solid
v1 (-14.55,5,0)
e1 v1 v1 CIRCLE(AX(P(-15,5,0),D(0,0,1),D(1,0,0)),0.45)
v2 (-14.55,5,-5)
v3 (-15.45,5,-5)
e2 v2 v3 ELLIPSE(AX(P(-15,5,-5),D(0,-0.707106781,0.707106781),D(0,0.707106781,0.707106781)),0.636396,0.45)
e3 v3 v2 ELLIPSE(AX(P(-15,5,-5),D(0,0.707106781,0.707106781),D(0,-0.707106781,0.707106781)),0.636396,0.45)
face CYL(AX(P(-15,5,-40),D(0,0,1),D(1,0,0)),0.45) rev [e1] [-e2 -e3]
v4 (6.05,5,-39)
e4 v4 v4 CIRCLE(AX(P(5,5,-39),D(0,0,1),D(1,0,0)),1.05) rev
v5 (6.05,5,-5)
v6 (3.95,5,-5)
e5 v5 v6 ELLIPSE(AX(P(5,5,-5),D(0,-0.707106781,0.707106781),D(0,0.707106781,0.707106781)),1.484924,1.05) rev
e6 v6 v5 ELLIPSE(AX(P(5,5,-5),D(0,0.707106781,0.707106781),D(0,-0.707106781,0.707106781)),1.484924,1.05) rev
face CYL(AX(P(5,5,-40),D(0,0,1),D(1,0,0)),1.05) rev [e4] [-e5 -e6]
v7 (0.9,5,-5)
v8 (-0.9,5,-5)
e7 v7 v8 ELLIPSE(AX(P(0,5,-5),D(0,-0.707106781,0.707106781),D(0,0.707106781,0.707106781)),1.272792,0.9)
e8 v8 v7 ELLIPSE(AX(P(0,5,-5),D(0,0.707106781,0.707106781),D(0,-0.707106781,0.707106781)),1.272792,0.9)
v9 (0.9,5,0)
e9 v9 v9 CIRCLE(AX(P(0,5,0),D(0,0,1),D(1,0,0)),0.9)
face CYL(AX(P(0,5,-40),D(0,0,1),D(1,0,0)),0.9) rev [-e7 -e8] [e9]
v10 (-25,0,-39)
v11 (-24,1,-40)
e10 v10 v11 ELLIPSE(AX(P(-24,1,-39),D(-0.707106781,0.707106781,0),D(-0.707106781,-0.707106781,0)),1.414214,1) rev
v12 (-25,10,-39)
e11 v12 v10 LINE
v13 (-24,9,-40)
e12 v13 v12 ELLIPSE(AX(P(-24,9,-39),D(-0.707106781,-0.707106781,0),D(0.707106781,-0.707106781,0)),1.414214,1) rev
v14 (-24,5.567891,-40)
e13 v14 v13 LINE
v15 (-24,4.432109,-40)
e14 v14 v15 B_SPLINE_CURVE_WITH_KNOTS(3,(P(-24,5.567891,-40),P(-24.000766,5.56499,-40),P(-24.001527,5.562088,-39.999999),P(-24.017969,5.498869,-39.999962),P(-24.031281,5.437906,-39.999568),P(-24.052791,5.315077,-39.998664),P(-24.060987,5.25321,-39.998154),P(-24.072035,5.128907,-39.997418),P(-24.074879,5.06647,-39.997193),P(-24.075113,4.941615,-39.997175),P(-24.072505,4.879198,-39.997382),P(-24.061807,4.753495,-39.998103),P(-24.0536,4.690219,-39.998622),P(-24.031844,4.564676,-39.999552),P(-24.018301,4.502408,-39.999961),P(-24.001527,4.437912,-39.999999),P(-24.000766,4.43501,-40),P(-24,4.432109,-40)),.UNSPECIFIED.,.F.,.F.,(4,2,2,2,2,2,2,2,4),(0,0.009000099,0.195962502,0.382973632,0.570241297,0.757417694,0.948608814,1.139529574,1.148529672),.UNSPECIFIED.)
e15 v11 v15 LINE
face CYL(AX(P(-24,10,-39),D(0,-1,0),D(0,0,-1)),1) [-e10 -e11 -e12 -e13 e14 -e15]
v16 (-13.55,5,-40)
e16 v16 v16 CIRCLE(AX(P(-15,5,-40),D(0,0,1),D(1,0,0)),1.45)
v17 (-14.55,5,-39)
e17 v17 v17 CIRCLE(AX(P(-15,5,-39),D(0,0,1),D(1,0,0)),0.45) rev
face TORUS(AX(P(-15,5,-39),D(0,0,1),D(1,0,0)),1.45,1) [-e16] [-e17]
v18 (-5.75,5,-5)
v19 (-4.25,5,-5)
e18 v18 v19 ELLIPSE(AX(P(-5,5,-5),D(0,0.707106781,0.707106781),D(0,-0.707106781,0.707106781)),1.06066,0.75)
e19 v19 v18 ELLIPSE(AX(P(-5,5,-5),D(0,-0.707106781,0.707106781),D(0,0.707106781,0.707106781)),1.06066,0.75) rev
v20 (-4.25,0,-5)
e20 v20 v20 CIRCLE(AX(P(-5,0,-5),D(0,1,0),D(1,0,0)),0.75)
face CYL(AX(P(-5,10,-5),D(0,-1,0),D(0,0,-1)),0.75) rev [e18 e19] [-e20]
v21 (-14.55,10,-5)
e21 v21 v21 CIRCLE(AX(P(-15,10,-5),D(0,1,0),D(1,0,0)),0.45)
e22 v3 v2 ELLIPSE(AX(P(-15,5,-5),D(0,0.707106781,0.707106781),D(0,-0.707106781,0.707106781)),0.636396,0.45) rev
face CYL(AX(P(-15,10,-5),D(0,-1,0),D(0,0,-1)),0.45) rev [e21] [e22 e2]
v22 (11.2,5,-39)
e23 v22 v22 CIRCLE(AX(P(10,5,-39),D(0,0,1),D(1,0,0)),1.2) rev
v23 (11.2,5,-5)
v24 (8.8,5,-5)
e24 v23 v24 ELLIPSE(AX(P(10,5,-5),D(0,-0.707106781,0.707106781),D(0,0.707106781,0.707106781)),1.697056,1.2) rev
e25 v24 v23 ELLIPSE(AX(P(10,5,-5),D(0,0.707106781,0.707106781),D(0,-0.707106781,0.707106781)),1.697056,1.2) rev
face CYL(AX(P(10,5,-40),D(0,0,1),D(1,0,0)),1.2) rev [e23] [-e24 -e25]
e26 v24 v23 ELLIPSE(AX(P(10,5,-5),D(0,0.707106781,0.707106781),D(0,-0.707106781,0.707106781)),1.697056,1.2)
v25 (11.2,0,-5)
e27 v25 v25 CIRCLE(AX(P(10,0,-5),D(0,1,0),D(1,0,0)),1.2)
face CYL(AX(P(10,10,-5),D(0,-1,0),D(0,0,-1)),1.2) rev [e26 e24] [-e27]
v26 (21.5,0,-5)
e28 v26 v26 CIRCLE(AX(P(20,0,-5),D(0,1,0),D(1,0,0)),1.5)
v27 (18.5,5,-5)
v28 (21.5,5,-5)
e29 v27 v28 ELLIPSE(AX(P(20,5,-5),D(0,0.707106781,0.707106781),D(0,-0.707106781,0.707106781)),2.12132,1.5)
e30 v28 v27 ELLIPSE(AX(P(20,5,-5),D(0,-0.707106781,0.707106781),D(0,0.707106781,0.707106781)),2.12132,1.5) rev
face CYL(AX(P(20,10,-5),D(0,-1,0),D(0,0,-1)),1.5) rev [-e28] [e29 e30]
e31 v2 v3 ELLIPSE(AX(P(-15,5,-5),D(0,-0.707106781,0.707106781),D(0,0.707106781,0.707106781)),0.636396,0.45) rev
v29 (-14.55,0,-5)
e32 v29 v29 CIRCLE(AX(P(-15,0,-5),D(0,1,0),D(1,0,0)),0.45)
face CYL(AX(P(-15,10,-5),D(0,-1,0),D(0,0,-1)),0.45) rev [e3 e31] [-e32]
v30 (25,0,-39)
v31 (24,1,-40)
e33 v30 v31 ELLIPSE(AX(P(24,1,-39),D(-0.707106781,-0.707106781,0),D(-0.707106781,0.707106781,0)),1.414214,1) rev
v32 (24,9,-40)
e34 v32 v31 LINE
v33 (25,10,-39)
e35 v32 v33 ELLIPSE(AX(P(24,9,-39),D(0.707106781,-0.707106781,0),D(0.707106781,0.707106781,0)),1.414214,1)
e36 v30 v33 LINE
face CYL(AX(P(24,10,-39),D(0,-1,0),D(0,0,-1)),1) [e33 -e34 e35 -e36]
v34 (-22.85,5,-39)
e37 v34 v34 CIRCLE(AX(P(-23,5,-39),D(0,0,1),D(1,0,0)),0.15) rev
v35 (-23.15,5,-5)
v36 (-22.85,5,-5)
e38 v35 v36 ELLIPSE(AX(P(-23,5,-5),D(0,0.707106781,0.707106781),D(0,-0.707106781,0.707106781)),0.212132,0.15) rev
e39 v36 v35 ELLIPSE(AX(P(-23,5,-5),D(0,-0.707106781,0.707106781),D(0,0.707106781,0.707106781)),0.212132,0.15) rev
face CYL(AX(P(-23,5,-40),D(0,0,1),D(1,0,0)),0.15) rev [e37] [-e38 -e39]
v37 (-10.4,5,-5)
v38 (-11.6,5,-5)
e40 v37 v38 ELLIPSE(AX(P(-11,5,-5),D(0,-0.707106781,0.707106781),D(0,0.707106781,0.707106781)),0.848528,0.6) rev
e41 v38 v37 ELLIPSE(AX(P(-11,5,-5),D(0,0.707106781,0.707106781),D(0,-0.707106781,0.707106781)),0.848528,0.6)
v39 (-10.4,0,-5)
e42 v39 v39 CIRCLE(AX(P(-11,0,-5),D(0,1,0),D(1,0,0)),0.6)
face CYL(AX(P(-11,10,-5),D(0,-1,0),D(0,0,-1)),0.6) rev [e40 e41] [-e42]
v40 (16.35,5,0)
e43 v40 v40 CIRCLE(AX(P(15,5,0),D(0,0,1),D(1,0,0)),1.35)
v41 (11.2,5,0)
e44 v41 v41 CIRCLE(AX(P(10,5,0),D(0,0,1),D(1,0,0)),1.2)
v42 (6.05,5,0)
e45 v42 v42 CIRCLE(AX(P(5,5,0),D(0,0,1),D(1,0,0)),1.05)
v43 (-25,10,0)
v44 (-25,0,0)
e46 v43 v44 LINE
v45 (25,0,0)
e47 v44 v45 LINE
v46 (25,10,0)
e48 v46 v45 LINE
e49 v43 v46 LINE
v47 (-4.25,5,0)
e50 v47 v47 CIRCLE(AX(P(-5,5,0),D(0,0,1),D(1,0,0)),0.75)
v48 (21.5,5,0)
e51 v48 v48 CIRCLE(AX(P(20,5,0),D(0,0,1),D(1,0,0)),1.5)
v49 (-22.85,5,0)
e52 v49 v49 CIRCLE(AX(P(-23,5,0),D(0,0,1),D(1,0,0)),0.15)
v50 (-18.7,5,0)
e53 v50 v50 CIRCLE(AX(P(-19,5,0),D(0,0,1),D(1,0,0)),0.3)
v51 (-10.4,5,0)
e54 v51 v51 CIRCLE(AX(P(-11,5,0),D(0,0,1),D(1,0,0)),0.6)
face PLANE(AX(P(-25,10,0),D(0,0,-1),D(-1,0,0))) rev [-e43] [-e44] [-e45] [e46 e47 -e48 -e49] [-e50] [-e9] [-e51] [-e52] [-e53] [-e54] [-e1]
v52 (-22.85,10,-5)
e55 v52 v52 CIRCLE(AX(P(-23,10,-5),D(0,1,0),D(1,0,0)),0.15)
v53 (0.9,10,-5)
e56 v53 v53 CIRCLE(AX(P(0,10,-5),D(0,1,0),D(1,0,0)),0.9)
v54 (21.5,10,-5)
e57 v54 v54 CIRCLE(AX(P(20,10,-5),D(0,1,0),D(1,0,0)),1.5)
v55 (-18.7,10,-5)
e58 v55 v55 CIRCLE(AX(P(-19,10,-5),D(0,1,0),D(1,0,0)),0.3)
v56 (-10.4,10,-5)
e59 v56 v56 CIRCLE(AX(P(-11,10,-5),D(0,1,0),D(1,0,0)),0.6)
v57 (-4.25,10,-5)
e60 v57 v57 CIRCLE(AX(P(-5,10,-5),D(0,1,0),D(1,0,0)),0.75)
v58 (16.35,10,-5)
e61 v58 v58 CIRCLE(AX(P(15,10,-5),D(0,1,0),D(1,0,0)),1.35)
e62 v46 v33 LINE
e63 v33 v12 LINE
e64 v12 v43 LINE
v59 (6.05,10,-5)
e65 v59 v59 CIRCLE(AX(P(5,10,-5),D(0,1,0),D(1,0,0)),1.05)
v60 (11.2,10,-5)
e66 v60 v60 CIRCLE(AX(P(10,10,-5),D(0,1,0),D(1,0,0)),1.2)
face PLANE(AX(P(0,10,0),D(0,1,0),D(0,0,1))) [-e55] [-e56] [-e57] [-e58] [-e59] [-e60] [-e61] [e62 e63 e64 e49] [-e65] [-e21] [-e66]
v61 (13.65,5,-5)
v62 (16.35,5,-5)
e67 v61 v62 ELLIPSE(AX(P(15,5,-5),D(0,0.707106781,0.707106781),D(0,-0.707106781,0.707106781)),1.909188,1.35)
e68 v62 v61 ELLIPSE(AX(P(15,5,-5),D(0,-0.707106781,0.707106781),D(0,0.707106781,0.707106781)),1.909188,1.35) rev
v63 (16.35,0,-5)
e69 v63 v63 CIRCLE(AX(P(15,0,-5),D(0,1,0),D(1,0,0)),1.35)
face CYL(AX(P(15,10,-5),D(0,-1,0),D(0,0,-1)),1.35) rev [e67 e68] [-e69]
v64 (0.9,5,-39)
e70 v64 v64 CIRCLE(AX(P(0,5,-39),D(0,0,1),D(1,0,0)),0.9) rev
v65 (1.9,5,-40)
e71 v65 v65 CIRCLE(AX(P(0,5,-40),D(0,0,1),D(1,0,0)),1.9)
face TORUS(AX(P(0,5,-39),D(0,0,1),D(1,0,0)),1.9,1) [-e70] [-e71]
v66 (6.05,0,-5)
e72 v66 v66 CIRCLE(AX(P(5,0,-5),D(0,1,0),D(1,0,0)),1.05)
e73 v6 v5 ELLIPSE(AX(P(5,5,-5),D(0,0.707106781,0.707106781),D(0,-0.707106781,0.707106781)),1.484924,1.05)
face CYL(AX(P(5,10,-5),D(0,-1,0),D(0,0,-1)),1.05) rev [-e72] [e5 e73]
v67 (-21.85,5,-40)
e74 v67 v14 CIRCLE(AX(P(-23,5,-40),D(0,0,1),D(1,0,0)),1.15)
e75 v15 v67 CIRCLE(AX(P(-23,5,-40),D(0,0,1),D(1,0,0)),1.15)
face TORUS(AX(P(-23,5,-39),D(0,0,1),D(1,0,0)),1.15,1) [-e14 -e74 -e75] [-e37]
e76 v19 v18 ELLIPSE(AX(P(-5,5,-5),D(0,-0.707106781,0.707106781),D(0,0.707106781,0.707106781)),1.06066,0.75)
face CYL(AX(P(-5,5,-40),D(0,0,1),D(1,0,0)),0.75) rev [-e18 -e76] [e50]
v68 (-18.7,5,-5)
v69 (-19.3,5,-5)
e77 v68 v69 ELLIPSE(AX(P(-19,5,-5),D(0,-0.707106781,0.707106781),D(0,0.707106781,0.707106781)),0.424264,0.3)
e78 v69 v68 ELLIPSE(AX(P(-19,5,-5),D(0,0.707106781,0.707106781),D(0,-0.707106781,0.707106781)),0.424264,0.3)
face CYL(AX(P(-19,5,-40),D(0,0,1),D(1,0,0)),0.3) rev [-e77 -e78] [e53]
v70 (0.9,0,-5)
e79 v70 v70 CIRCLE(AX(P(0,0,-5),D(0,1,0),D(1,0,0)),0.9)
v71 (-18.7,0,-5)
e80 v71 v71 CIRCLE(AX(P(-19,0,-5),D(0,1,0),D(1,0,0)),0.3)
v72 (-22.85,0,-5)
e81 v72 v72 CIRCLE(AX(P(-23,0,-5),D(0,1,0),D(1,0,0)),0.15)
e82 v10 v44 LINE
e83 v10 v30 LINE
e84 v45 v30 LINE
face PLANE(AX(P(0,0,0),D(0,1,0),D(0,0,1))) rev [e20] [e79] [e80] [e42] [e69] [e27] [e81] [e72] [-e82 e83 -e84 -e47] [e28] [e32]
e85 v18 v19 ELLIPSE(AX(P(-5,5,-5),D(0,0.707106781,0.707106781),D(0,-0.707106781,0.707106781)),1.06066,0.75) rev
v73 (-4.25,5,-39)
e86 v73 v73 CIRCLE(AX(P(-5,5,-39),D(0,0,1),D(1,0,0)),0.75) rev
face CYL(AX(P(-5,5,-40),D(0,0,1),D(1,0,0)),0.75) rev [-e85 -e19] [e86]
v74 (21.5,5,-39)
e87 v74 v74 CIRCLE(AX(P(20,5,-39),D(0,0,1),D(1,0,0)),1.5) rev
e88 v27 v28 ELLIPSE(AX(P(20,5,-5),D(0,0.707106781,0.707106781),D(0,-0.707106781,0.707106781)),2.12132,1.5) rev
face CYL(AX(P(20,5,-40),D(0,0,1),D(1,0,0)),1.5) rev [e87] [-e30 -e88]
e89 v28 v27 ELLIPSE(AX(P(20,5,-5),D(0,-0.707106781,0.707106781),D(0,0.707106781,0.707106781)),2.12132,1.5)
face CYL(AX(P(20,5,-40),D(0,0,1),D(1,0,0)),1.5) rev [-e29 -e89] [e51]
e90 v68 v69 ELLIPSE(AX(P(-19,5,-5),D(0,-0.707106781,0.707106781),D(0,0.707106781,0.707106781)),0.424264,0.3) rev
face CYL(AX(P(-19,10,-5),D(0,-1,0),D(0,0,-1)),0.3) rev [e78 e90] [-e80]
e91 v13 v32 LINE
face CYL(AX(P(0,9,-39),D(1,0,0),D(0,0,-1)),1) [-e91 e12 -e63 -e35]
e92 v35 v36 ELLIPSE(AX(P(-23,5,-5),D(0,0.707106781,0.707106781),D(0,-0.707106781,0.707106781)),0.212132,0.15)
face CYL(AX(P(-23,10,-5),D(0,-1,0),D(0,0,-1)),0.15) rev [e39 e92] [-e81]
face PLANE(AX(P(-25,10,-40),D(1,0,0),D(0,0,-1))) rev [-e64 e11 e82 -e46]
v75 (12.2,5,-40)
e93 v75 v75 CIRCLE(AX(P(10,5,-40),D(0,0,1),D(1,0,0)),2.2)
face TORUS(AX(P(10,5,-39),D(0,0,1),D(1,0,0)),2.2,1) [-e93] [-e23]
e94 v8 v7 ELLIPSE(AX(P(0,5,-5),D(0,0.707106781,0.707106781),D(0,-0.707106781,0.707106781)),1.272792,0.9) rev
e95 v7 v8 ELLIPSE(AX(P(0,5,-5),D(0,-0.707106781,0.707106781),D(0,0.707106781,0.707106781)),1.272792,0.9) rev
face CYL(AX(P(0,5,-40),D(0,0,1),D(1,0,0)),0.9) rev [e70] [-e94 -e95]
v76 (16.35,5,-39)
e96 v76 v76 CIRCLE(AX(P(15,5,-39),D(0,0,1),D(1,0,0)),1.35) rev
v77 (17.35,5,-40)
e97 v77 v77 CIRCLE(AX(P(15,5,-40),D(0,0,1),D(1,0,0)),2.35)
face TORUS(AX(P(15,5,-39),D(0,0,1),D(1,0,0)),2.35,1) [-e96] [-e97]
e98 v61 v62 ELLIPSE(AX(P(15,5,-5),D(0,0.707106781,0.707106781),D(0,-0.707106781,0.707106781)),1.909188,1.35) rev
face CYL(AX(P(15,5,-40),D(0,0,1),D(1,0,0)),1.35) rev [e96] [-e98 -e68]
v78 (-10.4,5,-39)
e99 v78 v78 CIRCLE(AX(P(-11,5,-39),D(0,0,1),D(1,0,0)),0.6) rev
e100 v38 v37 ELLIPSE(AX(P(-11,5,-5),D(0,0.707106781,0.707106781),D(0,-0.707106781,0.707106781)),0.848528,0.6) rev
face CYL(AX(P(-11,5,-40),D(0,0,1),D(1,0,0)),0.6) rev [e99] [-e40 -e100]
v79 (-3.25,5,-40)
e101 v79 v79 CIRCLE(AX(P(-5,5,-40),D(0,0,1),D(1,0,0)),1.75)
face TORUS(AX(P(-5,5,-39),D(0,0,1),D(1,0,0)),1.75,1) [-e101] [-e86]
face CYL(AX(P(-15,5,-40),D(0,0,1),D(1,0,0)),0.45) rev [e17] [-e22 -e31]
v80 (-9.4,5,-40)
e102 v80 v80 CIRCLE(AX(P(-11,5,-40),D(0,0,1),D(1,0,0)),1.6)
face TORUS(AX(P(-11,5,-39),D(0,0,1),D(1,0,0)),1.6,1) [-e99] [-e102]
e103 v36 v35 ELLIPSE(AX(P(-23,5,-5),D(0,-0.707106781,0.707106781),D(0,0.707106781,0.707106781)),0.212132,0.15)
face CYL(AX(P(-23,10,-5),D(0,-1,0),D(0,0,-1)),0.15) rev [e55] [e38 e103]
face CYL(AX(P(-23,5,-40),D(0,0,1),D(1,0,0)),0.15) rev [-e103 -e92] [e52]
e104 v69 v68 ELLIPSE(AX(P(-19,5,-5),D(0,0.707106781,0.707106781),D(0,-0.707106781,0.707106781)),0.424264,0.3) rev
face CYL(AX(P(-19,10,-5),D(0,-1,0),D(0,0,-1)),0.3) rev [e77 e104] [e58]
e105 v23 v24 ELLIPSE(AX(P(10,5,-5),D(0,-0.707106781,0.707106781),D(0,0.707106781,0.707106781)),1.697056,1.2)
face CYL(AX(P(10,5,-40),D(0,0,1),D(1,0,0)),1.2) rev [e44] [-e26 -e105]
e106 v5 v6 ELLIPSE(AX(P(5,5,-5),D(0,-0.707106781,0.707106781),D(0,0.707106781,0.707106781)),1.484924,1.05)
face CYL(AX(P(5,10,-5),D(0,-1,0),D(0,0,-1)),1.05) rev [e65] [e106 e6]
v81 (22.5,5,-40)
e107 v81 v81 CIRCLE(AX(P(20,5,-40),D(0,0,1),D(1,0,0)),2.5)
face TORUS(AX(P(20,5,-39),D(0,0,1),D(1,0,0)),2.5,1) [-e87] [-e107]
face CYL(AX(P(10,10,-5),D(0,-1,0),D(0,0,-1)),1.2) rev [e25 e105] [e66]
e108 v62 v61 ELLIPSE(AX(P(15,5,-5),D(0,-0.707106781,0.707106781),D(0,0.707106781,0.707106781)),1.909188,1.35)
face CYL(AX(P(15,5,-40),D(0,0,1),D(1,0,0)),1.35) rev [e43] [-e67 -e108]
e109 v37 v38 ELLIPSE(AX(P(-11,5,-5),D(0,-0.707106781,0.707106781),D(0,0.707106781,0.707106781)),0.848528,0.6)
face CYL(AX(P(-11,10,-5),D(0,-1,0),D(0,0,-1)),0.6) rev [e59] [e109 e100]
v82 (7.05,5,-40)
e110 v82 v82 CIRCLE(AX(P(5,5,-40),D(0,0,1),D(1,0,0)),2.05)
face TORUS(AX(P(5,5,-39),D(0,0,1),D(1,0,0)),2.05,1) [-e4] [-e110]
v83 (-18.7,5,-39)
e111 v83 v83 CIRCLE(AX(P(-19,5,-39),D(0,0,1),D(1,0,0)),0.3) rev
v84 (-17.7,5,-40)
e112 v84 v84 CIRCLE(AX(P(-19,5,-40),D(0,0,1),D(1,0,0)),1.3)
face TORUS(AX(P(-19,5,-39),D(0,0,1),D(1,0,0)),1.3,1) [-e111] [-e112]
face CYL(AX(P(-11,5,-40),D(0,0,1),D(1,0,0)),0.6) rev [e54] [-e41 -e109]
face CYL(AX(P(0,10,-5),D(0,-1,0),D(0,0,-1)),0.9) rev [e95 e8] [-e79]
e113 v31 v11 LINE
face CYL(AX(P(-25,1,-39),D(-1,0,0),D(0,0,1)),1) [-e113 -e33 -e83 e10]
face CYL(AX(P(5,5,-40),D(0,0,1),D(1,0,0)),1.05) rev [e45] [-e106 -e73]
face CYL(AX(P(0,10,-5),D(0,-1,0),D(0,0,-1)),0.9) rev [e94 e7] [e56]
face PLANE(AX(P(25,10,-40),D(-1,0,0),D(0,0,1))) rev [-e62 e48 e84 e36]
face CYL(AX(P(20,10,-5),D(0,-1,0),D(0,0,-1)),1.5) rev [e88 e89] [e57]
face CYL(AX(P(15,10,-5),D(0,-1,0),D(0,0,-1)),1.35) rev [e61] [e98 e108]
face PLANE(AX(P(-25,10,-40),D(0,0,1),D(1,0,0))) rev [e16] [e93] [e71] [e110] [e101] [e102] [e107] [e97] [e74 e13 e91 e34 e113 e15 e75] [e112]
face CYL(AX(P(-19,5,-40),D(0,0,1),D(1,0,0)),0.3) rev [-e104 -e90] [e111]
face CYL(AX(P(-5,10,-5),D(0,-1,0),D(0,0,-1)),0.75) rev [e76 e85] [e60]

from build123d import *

# Parameters (mm, degrees)
SKETCH1_W                 = 50
SKETCH1_H                 = 40
BOSS_EXTRUDE1_DEPTH       = 10
CUT_EXTRUDE1_START        = -40
CUT_EXTRUDE1_OUTLINE_R    = 0.3
CUT_EXTRUDE1_OUTLINE_R_2  = 0.45
CUT_EXTRUDE1_OUTLINE_R_3  = 0.6
CUT_EXTRUDE1_OUTLINE_R_4  = 0.75
CUT_EXTRUDE1_OUTLINE_R_5  = 0.9
CUT_EXTRUDE1_OUTLINE_R_6  = 1.05
CUT_EXTRUDE1_OUTLINE_R_7  = 1.35
CUT_EXTRUDE1_OUTLINE_R_8  = 1.5
CUT_EXTRUDE1_OUTLINE_R_9  = 1.2
CUT_EXTRUDE1_OUTLINE_R_10 = 0.15
CUT_EXTRUDE1_DEPTH        = 40
FILLET1_R                 = 1


# Read off the part's stored shape, not the designer's step: Cut-Extrude1
with BuildPart() as part:
    # Sketch1 → Boss-Extrude1 (new body)
    with BuildSketch(Plane(origin=(0, 0, 0), x_dir=(1, 0, 0), z_dir=(0, 1, 0))):
        with Locations((0, 20)):
            Rectangle(SKETCH1_W, SKETCH1_H)
    extrude(amount=BOSS_EXTRUDE1_DEPTH)

    # Cut-Extrude1 outline → Cut-Extrude1 (cut)
    with BuildSketch(Plane.XY.offset(CUT_EXTRUDE1_START)):
        with Locations((-19, 5)):
            Circle(CUT_EXTRUDE1_OUTLINE_R)
        with Locations((-15, 5)):
            Circle(CUT_EXTRUDE1_OUTLINE_R_2)
        with Locations((-11, 5)):
            Circle(CUT_EXTRUDE1_OUTLINE_R_3)
        with Locations((-5, 5)):
            Circle(CUT_EXTRUDE1_OUTLINE_R_4)
        with Locations((0, 5)):
            Circle(CUT_EXTRUDE1_OUTLINE_R_5)
        with Locations((5, 5)):
            Circle(CUT_EXTRUDE1_OUTLINE_R_6)
        with Locations((15, 5)):
            Circle(CUT_EXTRUDE1_OUTLINE_R_7)
        with Locations((20, 5)):
            Circle(CUT_EXTRUDE1_OUTLINE_R_8)
        with Locations((10, 5)):
            Circle(CUT_EXTRUDE1_OUTLINE_R_9)
        with Locations((-23, 5)):
            Circle(CUT_EXTRUDE1_OUTLINE_R_10)
    cut_extrude1 = extrude(amount=CUT_EXTRUDE1_DEPTH, mode=Mode.SUBTRACT)

    # Mirror1: Cut-Extrude1 across plane
    add(cut_extrude1.mirror(Plane(origin=(0, 0, 0), x_dir=(0, -0.7071067811865478, 0.7071067811865472), z_dir=(0, 0.7071067811865475, 0.7071067811865477))), mode=Mode.SUBTRACT)

    # Fillet1
    # the kernel refuses this fillet: 1 mm, written as the material it takes off along each edge
    with BuildSketch(Plane(origin=(-27.5, 10, -40), x_dir=(0, -1, 0), z_dir=(1, 0, 0))) as fillet1_piece_1:
        with BuildLine():
            CenterArc((FILLET1_R, -FILLET1_R), FILLET1_R, 90, 90)
            Line((0, -FILLET1_R), (0, 0))
            Line((0, 0), (FILLET1_R, 0))
        make_face()
    extrude(amount=55, mode=Mode.SUBTRACT)
    with BuildSketch(Plane(origin=(-23, 5, -40), x_dir=(1, 0, 0), z_dir=(0, -1, 0))) as fillet1_piece_2:
        with BuildLine():
            CenterArc((0.15 + FILLET1_R, FILLET1_R), FILLET1_R, 180, 90)
            Line((0.15, FILLET1_R), (0.15, 0))
            Line((0.15, 0), (0.15 + FILLET1_R, 0))
        make_face()
    revolve(axis=Axis((-23, 5, -40), (0, 0, 1)), mode=Mode.SUBTRACT)
    with BuildSketch(Plane(origin=(10, 5, -40), x_dir=(1, 0, 0), z_dir=(0, -1, 0))) as fillet1_piece_3:
        with BuildLine():
            CenterArc((1.2 + FILLET1_R, FILLET1_R), FILLET1_R, 180, 90)
            Line((1.2, FILLET1_R), (1.2, 0))
            Line((1.2, 0), (1.2 + FILLET1_R, 0))
        make_face()
    revolve(axis=Axis((10, 5, -40), (0, 0, 1)), mode=Mode.SUBTRACT)
    with BuildSketch(Plane(origin=(20, 5, -40), x_dir=(1, 0, 0), z_dir=(0, -1, 0))) as fillet1_piece_4:
        with BuildLine():
            CenterArc((1.5 + FILLET1_R, FILLET1_R), FILLET1_R, 180, 90)
            Line((1.5, FILLET1_R), (1.5, 0))
            Line((1.5, 0), (1.5 + FILLET1_R, 0))
        make_face()
    revolve(axis=Axis((20, 5, -40), (0, 0, 1)), mode=Mode.SUBTRACT)
    with BuildSketch(Plane(origin=(15, 5, -40), x_dir=(1, 0, 0), z_dir=(0, -1, 0))) as fillet1_piece_5:
        with BuildLine():
            CenterArc((1.35 + FILLET1_R, FILLET1_R), FILLET1_R, 180, 90)
            Line((1.35, FILLET1_R), (1.35, 0))
            Line((1.35, 0), (1.35 + FILLET1_R, 0))
        make_face()
    revolve(axis=Axis((15, 5, -40), (0, 0, 1)), mode=Mode.SUBTRACT)
    with BuildSketch(Plane(origin=(5, 5, -40), x_dir=(1, 0, 0), z_dir=(0, -1, 0))) as fillet1_piece_6:
        with BuildLine():
            CenterArc((1.05 + FILLET1_R, FILLET1_R), FILLET1_R, 180, 90)
            Line((1.05, FILLET1_R), (1.05, 0))
            Line((1.05, 0), (1.05 + FILLET1_R, 0))
        make_face()
    revolve(axis=Axis((5, 5, -40), (0, 0, 1)), mode=Mode.SUBTRACT)
    with BuildSketch(Plane(origin=(0, 5, -40), x_dir=(1, 0, 0), z_dir=(0, -1, 0))) as fillet1_piece_7:
        with BuildLine():
            CenterArc((0.9 + FILLET1_R, FILLET1_R), FILLET1_R, 180, 90)
            Line((0.9, FILLET1_R), (0.9, 0))
            Line((0.9, 0), (0.9 + FILLET1_R, 0))
        make_face()
    revolve(axis=Axis((0, 5, -40), (0, 0, 1)), mode=Mode.SUBTRACT)
    with BuildSketch(Plane(origin=(-5, 5, -40), x_dir=(1, 0, 0), z_dir=(0, -1, 0))) as fillet1_piece_8:
        with BuildLine():
            CenterArc((0.75 + FILLET1_R, FILLET1_R), FILLET1_R, 180, 90)
            Line((0.75, FILLET1_R), (0.75, 0))
            Line((0.75, 0), (0.75 + FILLET1_R, 0))
        make_face()
    revolve(axis=Axis((-5, 5, -40), (0, 0, 1)), mode=Mode.SUBTRACT)
    with BuildSketch(Plane(origin=(-11, 5, -40), x_dir=(1, 0, 0), z_dir=(0, -1, 0))) as fillet1_piece_9:
        with BuildLine():
            CenterArc((0.6 + FILLET1_R, FILLET1_R), FILLET1_R, 180, 90)
            Line((0.6, FILLET1_R), (0.6, 0))
            Line((0.6, 0), (0.6 + FILLET1_R, 0))
        make_face()
    revolve(axis=Axis((-11, 5, -40), (0, 0, 1)), mode=Mode.SUBTRACT)
    with BuildSketch(Plane(origin=(-15, 5, -40), x_dir=(1, 0, 0), z_dir=(0, -1, 0))) as fillet1_piece_10:
        with BuildLine():
            CenterArc((0.45 + FILLET1_R, FILLET1_R), FILLET1_R, 180, 90)
            Line((0.45, FILLET1_R), (0.45, 0))
            Line((0.45, 0), (0.45 + FILLET1_R, 0))
        make_face()
    revolve(axis=Axis((-15, 5, -40), (0, 0, 1)), mode=Mode.SUBTRACT)
    with BuildSketch(Plane(origin=(-19, 5, -40), x_dir=(1, 0, 0), z_dir=(0, -1, 0))) as fillet1_piece_11:
        with BuildLine():
            CenterArc((0.3 + FILLET1_R, FILLET1_R), FILLET1_R, 180, 90)
            Line((0.3, FILLET1_R), (0.3, 0))
            Line((0.3, 0), (0.3 + FILLET1_R, 0))
        make_face()
    revolve(axis=Axis((-19, 5, -40), (0, 0, 1)), mode=Mode.SUBTRACT)
    with BuildSketch(Plane(origin=(-27.5, 0, -40), x_dir=(0, 1, 0), z_dir=(1, 0, 0))) as fillet1_piece_12:
        with BuildLine():
            CenterArc((FILLET1_R, FILLET1_R), FILLET1_R, 180, 90)
            Line((0, FILLET1_R), (0, 0))
            Line((0, 0), (FILLET1_R, 0))
        make_face()
    extrude(amount=55, mode=Mode.SUBTRACT)
    with BuildSketch(Plane(origin=(-25, -2.5, -40), x_dir=(1, 0, 0), z_dir=(0, 1, 0))) as fillet1_piece_13:
        with BuildLine():
            CenterArc((FILLET1_R, -FILLET1_R), FILLET1_R, 90, 90)
            Line((0, -FILLET1_R), (0, 0))
            Line((0, 0), (FILLET1_R, 0))
        make_face()
    extrude(amount=15, mode=Mode.SUBTRACT)
    with BuildSketch(Plane(origin=(25, -2.5, -40), x_dir=(-1, 0, 0), z_dir=(0, 1, 0))) as fillet1_piece_14:
        with BuildLine():
            CenterArc((FILLET1_R, FILLET1_R), FILLET1_R, 180, 90)
            Line((0, FILLET1_R), (0, 0))
            Line((0, 0), (FILLET1_R, 0))
        make_face()
    extrude(amount=15, mode=Mode.SUBTRACT)


solid = part.part
